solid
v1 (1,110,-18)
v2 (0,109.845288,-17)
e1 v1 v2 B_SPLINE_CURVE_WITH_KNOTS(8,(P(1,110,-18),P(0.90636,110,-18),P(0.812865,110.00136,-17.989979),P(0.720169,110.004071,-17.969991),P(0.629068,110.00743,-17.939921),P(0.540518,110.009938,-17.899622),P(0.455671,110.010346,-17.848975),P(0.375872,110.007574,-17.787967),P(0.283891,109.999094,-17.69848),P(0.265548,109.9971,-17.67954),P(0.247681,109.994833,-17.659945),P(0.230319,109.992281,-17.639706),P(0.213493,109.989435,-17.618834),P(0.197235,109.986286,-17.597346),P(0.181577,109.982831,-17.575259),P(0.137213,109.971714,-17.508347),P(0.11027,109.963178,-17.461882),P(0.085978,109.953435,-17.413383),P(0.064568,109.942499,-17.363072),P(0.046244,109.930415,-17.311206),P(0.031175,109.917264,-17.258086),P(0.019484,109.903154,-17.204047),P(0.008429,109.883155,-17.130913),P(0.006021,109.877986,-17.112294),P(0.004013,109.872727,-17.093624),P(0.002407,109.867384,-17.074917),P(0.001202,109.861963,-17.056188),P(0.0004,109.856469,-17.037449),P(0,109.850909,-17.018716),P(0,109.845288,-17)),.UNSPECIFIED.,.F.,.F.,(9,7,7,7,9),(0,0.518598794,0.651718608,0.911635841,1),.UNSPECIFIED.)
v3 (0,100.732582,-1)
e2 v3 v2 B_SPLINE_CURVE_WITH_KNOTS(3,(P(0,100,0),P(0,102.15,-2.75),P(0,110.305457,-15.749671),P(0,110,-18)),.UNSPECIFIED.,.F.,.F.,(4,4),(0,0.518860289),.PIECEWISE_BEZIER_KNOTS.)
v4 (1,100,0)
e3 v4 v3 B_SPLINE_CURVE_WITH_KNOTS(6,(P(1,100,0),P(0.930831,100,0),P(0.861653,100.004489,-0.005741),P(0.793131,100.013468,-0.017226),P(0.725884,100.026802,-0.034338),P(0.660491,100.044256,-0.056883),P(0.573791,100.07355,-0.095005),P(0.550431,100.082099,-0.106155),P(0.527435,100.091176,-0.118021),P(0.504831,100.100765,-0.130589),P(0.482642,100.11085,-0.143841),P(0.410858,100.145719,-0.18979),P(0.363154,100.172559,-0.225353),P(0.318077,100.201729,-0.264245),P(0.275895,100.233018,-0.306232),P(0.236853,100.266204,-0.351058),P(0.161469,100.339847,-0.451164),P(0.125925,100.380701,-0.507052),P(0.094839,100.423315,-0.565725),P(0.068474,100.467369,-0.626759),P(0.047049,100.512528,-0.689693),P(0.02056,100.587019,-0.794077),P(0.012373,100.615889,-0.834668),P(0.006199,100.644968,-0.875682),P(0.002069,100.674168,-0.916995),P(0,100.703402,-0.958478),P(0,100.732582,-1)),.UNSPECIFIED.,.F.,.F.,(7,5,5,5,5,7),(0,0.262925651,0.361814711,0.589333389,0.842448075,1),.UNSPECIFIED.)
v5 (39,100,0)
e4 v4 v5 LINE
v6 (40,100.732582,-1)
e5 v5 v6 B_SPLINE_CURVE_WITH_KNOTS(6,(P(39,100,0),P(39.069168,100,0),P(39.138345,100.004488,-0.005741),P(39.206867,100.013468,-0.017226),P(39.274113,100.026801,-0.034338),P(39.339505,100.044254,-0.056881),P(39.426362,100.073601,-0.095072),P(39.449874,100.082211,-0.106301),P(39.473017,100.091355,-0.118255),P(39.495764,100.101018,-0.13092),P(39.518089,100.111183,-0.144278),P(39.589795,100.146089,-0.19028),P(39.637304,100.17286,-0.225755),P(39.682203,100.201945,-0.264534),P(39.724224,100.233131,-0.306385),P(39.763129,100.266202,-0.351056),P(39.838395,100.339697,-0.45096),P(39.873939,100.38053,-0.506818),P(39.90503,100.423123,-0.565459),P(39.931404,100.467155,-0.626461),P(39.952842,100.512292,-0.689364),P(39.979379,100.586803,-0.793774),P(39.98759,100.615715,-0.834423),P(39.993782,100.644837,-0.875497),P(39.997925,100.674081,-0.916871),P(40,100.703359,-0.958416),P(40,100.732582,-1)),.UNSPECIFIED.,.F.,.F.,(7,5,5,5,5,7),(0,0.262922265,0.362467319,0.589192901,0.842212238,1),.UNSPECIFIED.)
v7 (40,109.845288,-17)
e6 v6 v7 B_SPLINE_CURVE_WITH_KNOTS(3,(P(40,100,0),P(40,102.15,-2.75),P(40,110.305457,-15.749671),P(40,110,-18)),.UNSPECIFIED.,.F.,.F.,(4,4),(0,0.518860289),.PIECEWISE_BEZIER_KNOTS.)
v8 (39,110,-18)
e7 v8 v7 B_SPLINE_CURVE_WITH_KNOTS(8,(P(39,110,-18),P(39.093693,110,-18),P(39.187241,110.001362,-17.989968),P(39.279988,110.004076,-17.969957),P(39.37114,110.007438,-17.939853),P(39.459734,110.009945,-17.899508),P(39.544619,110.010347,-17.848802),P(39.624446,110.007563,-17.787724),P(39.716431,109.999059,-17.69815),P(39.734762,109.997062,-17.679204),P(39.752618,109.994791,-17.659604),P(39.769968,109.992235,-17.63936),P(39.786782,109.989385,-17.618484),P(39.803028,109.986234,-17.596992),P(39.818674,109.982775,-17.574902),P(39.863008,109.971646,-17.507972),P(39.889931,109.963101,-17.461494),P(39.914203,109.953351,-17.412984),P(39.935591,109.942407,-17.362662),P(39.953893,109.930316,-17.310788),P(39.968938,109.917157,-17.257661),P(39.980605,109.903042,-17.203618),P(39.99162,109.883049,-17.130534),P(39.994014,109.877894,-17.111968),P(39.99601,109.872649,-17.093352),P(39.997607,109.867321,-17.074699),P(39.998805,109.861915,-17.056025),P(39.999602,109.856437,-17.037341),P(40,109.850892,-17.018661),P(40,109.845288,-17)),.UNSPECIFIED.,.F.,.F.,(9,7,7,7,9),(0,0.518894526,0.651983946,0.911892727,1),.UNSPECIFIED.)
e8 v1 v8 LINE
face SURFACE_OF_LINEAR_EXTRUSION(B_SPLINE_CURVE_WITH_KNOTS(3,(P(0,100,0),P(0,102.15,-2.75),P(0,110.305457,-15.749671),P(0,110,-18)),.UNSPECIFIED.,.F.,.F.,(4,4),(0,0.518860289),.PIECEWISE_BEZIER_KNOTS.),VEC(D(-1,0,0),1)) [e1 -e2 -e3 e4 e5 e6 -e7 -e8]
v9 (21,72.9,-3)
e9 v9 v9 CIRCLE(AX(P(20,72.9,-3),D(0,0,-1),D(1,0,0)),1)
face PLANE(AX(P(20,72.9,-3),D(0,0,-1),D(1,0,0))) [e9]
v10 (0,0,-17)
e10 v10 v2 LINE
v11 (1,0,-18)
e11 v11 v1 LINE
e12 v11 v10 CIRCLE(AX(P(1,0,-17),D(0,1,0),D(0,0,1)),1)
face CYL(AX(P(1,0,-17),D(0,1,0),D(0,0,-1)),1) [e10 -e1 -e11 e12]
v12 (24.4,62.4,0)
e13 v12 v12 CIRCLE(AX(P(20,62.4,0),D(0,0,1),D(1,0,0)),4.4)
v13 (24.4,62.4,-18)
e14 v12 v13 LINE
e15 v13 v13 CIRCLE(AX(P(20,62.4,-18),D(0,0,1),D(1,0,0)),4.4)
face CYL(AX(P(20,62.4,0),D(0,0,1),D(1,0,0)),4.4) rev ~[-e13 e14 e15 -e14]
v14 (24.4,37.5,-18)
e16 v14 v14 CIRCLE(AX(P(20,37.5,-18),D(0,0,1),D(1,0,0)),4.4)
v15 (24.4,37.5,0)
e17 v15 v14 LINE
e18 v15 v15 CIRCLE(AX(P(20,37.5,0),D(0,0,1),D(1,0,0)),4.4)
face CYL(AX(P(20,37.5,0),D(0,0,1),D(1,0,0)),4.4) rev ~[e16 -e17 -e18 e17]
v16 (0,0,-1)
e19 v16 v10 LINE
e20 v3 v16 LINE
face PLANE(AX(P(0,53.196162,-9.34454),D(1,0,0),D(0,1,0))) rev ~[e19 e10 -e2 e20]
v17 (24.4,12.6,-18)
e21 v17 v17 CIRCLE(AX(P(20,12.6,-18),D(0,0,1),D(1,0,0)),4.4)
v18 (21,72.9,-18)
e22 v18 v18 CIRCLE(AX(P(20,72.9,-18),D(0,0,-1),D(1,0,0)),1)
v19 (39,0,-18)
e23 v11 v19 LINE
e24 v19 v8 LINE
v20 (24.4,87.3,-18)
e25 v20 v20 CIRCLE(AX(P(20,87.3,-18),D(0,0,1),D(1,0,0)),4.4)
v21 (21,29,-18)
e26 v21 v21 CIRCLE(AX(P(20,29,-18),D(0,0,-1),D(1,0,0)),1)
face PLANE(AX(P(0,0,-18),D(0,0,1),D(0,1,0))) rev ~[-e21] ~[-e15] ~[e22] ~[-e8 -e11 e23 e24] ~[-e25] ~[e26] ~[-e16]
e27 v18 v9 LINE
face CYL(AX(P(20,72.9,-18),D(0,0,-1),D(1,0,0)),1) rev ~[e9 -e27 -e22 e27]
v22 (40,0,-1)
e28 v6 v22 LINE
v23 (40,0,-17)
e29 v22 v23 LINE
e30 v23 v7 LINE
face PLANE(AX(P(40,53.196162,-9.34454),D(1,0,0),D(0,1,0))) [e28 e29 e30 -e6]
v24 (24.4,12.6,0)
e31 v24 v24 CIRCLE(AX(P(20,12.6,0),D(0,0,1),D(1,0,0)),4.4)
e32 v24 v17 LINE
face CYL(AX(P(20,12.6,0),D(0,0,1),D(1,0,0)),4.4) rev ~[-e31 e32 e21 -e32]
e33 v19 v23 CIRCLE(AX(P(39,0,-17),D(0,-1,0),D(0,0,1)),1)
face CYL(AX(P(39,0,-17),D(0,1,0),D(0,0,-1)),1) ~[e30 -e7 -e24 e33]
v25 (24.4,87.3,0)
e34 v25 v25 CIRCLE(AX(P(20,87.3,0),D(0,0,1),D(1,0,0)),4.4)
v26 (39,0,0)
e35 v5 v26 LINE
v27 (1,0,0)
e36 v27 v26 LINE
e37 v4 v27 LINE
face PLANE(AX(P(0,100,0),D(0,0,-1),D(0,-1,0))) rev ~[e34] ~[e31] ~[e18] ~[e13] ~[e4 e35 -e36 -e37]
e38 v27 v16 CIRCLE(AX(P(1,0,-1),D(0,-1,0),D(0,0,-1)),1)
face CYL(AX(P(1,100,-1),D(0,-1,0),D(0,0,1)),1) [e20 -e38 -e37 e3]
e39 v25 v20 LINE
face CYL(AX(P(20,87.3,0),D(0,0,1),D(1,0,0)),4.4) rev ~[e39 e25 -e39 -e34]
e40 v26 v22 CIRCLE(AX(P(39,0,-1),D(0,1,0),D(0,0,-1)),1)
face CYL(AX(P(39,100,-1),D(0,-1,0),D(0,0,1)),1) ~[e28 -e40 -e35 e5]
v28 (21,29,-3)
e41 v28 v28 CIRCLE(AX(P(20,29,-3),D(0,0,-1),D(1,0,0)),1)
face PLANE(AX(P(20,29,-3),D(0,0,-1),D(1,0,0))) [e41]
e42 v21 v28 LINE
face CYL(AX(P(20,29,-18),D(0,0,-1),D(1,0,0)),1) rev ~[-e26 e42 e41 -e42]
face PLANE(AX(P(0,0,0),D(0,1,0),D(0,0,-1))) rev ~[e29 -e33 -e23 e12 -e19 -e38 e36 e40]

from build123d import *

# Parameters (mm, degrees)
F1_DEPTH = 40
F2_R     = 4.4
F3_DEPTH = 18
F4_R     = 1
F5_R     = 1
F6_DEPTH = 15


with BuildPart() as f1:
    # F0 (on Right) → F1 (new body)
    with BuildSketch(Plane.YZ):
        with BuildLine():
            Line((0, 0), (0, -18))
            Line((0, -18), (108.1519347629, -18))
            Line((108.1519347629, -18), (110, -18))
            add(Edge.make_bspline(
                [(100, 0), (102.15, -2.75), (110.3054567735, -15.7496706799), (110, -18)],
                knots=[0, 0, 0, 0, 0.5188602886, 0.5188602886, 0.5188602886, 0.5188602886], degree=3))
            Line((100, 0), (0, 0))
        make_face()
    extrude(amount=F1_DEPTH)

    # F2 (on face) → F3 (cut, through all)
    with BuildSketch(Plane.XY):
        with Locations((20, 87.3)):
            Circle(F2_R)
        with Locations((20, 62.4)):
            Circle(F2_R)
        with Locations((20, 37.5)):
            Circle(F2_R)
        with Locations((20, 12.6)):
            Circle(F2_R)
    extrude(amount=-F3_DEPTH, mode=Mode.SUBTRACT)

    # F4
    f4_edges = [f1.edges().sort_by_distance(p)[0] for p in [
        (0, 50, 0),
        (0, 55, -18),
        (40, 50, 0),
        (40, 55, -18),
    ]]
    fillet(f4_edges, radius=F4_R)

    # F5 (on face) → F6 (cut)
    with BuildSketch(Plane(origin=(0, 0, -18), x_dir=(1, 0, 0), z_dir=(0, 0, -1))):
        with Locations((20, -72.9)):
            Circle(F5_R)
        with Locations((20, -29)):
            Circle(F5_R)
    extrude(amount=-F6_DEPTH, mode=Mode.SUBTRACT)


solid = f1.part
